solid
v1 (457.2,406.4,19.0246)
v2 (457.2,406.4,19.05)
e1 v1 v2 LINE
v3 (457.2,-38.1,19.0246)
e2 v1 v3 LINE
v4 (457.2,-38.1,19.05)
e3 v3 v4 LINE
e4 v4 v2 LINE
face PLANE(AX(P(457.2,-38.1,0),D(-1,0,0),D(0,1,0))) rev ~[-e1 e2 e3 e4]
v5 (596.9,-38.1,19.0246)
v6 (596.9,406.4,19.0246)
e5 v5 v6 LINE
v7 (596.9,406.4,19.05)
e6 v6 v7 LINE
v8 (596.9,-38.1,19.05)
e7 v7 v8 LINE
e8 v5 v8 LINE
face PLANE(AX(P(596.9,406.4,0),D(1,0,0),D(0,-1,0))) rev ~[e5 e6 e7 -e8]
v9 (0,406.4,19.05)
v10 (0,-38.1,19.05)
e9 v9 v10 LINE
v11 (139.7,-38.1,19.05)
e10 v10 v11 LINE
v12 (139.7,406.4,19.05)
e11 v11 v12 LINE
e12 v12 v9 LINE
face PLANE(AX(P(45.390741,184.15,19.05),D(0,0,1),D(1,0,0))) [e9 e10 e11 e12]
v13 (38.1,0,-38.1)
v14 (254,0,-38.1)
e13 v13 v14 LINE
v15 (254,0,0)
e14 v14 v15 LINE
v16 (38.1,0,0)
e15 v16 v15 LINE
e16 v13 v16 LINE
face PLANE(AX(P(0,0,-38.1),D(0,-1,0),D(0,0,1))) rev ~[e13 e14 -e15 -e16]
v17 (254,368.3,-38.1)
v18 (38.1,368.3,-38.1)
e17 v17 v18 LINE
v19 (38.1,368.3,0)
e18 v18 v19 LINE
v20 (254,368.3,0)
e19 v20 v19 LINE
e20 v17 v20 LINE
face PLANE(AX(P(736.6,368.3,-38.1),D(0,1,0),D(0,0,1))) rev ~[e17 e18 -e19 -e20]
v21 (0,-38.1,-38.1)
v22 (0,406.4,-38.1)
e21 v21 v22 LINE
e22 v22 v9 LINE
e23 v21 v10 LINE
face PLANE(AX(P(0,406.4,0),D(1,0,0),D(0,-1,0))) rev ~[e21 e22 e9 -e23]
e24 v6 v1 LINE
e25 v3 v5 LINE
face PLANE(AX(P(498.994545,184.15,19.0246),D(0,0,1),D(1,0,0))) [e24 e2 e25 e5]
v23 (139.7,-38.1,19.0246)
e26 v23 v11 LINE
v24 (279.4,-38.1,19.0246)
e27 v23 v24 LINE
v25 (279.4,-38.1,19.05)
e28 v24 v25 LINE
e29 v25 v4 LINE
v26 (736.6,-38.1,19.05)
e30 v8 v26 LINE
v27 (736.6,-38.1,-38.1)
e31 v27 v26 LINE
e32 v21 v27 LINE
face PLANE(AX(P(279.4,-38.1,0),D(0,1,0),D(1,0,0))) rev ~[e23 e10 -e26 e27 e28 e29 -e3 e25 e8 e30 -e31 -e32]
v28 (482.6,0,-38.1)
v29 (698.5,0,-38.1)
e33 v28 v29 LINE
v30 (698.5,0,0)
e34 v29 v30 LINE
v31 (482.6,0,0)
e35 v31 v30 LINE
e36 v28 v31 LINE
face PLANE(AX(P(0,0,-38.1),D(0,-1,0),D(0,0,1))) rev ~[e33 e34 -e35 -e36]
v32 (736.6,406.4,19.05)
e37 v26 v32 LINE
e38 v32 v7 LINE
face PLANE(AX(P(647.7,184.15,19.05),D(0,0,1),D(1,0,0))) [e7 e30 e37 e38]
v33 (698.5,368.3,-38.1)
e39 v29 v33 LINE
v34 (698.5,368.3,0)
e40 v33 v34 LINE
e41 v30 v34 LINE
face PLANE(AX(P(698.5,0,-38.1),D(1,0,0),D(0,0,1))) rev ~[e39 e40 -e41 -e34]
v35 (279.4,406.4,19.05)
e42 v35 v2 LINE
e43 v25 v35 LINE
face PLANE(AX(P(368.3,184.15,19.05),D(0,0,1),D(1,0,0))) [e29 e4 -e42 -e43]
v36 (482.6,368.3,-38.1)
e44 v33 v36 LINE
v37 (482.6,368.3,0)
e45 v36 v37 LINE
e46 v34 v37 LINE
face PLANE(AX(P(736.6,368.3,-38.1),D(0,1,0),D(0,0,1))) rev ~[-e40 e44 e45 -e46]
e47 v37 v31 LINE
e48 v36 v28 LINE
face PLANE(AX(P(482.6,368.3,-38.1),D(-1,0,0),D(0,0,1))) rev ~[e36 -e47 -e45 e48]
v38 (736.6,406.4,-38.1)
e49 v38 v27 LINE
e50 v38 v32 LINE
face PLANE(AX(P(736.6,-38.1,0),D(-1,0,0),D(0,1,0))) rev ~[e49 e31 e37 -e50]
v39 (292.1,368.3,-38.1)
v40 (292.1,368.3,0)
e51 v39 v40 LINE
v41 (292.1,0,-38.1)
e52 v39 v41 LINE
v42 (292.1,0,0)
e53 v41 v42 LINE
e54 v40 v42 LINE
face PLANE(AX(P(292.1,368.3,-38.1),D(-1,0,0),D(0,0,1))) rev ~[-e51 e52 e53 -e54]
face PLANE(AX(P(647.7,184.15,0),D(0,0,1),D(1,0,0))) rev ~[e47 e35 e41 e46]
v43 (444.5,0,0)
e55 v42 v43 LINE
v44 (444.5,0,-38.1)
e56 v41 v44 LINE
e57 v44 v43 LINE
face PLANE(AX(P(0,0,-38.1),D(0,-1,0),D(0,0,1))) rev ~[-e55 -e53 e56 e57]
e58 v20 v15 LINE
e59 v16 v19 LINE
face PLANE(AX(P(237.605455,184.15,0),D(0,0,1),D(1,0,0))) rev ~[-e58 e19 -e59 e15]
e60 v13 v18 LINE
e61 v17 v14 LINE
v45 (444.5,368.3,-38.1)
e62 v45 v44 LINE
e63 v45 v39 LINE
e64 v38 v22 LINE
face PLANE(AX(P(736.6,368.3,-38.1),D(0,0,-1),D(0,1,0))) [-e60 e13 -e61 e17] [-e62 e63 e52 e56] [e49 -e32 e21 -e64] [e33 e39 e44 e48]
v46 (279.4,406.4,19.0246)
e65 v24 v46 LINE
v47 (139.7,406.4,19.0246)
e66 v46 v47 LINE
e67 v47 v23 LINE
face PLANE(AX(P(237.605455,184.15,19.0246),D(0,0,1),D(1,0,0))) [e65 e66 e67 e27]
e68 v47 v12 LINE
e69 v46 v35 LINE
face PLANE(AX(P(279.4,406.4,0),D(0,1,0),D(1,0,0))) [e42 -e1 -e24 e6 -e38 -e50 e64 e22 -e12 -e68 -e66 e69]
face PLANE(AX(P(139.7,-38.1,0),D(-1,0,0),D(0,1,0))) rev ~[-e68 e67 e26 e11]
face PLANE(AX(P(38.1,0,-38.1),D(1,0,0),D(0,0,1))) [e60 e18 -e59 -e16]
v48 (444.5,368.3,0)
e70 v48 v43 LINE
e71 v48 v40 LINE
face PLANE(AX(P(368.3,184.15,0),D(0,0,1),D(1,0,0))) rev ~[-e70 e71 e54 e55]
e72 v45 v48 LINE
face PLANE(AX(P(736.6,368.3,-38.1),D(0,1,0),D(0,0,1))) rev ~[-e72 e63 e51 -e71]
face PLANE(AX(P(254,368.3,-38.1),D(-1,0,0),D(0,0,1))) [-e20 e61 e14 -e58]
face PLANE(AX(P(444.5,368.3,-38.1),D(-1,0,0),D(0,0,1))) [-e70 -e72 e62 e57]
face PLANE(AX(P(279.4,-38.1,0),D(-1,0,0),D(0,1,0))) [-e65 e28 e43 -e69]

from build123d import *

# Parameters (mm, degrees)
F0_W      = 38.1
F0_H      = 38.1
F1_DEPTH  = 736.6
F2_W      = 38.1
F2_H      = 38.1
F3_DEPTH  = 368.3
F4_W      = 38.1
F4_H      = 38.1
F5_DEPTH  = 736.6
F6_W      = 38.1
F6_H      = 38.1
F7_DEPTH  = 368.3
F8_W      = 101.6
F8_H      = 368.3
F9_DEPTH  = 19.05
F10_W     = 101.6
F10_H     = 368.3
F11_DEPTH = 19.05
F12_W     = 114.3
F12_H     = 368.3
F13_DEPTH = 19.0246
F14_W     = 114.3
F14_H     = 368.3
F15_DEPTH = 19.0246
F16_W     = 177.8
F16_H     = 444.5
F16_W_2   = 152.4
F16_H_2   = 368.3
F17_DEPTH = 19.05


with BuildPart() as f1:
    # F0 (on Right) → F1 (new body)
    with BuildSketch(Plane.YZ):
        with Locations((-19.05, -19.05)):
            Rectangle(F0_W, F0_H)
    extrude(amount=F1_DEPTH)

    # F2 (on face) → F3 (join)
    with BuildSketch(Plane(origin=(0, 0, 0), x_dir=(-1, 0, 0), z_dir=(0, 1, 0))):
        with Locations((-19.05, -19.05)):
            Rectangle(F2_W, F2_H)
        with Locations((-717.55, -19.05)):
            Rectangle(F2_W, F2_H)
    extrude(amount=F3_DEPTH)

    # F4 (on face) → F5 (join)
    with BuildSketch(Plane.YZ.offset(736.6)):
        with Locations((387.35, -19.05)):
            Rectangle(F4_W, F4_H)
    extrude(amount=-F5_DEPTH)

    # F6 (on face) → F7 (join, through all)
    with BuildSketch(Plane.XZ.offset(-368.3)):
        with Locations((273.05, -19.05)):
            Rectangle(F6_W, F6_H)
        with Locations((463.55, -19.05)):
            Rectangle(F6_W, F6_H)
    extrude(amount=F7_DEPTH)

    # F8 (on face) → F9 (join)
    with BuildSketch(Plane.XY):
        Polygon((139.7, 406.4), (0, 406.4), (0, -38.1), (139.7, -38.1), (139.7, 0), (38.1, 0), (38.1, 368.3), (139.7, 368.3), align=None)
        with Locations((88.9, 184.15)):
            Rectangle(F8_W, F8_H)
    extrude(amount=F9_DEPTH)

    # F10 (on face) → F11 (join)
    with BuildSketch(Plane.XY):
        with Locations((647.7, 184.15)):
            Rectangle(F10_W, F10_H)
        Polygon((736.6, -38.1), (736.6, 406.4), (596.9, 406.4), (596.9, 368.3), (698.5, 368.3), (698.5, 0), (596.9, 0), (596.9, -38.1), align=None)
    extrude(amount=F11_DEPTH)

    # F12 (on face) → F13 (join)
    with BuildSketch(Plane.XY):
        Polygon((279.4, 406.4), (139.7, 406.4), (139.7, 368.3), (254, 368.3), (254, 0), (139.7, 0), (139.7, -38.1), (279.4, -38.1), align=None)
        with Locations((196.85, 184.15)):
            Rectangle(F12_W, F12_H)
    extrude(amount=F13_DEPTH)

    # F14 (on face) → F15 (join)
    with BuildSketch(Plane.XY):
        Polygon((596.9, 368.3), (596.9, 406.4), (457.2, 406.4), (457.2, -38.1), (596.9, -38.1), (596.9, 0), (482.6, 0), (482.6, 368.3), align=None)
        with Locations((539.75, 184.15)):
            Rectangle(F14_W, F14_H)
    extrude(amount=F15_DEPTH)

    # F16 (on face) → F17 (join)
    with BuildSketch(Plane.XY):
        with Locations((368.3, 184.15)):
            Rectangle(F16_W, F16_H)
        with Locations((368.3, 184.15)):
            Rectangle(F16_W_2, F16_H_2, mode=Mode.SUBTRACT)
        with Locations((368.3, 184.15)):
            Rectangle(F16_W_2, F16_H_2)
    extrude(amount=F17_DEPTH)


solid = f1.part
